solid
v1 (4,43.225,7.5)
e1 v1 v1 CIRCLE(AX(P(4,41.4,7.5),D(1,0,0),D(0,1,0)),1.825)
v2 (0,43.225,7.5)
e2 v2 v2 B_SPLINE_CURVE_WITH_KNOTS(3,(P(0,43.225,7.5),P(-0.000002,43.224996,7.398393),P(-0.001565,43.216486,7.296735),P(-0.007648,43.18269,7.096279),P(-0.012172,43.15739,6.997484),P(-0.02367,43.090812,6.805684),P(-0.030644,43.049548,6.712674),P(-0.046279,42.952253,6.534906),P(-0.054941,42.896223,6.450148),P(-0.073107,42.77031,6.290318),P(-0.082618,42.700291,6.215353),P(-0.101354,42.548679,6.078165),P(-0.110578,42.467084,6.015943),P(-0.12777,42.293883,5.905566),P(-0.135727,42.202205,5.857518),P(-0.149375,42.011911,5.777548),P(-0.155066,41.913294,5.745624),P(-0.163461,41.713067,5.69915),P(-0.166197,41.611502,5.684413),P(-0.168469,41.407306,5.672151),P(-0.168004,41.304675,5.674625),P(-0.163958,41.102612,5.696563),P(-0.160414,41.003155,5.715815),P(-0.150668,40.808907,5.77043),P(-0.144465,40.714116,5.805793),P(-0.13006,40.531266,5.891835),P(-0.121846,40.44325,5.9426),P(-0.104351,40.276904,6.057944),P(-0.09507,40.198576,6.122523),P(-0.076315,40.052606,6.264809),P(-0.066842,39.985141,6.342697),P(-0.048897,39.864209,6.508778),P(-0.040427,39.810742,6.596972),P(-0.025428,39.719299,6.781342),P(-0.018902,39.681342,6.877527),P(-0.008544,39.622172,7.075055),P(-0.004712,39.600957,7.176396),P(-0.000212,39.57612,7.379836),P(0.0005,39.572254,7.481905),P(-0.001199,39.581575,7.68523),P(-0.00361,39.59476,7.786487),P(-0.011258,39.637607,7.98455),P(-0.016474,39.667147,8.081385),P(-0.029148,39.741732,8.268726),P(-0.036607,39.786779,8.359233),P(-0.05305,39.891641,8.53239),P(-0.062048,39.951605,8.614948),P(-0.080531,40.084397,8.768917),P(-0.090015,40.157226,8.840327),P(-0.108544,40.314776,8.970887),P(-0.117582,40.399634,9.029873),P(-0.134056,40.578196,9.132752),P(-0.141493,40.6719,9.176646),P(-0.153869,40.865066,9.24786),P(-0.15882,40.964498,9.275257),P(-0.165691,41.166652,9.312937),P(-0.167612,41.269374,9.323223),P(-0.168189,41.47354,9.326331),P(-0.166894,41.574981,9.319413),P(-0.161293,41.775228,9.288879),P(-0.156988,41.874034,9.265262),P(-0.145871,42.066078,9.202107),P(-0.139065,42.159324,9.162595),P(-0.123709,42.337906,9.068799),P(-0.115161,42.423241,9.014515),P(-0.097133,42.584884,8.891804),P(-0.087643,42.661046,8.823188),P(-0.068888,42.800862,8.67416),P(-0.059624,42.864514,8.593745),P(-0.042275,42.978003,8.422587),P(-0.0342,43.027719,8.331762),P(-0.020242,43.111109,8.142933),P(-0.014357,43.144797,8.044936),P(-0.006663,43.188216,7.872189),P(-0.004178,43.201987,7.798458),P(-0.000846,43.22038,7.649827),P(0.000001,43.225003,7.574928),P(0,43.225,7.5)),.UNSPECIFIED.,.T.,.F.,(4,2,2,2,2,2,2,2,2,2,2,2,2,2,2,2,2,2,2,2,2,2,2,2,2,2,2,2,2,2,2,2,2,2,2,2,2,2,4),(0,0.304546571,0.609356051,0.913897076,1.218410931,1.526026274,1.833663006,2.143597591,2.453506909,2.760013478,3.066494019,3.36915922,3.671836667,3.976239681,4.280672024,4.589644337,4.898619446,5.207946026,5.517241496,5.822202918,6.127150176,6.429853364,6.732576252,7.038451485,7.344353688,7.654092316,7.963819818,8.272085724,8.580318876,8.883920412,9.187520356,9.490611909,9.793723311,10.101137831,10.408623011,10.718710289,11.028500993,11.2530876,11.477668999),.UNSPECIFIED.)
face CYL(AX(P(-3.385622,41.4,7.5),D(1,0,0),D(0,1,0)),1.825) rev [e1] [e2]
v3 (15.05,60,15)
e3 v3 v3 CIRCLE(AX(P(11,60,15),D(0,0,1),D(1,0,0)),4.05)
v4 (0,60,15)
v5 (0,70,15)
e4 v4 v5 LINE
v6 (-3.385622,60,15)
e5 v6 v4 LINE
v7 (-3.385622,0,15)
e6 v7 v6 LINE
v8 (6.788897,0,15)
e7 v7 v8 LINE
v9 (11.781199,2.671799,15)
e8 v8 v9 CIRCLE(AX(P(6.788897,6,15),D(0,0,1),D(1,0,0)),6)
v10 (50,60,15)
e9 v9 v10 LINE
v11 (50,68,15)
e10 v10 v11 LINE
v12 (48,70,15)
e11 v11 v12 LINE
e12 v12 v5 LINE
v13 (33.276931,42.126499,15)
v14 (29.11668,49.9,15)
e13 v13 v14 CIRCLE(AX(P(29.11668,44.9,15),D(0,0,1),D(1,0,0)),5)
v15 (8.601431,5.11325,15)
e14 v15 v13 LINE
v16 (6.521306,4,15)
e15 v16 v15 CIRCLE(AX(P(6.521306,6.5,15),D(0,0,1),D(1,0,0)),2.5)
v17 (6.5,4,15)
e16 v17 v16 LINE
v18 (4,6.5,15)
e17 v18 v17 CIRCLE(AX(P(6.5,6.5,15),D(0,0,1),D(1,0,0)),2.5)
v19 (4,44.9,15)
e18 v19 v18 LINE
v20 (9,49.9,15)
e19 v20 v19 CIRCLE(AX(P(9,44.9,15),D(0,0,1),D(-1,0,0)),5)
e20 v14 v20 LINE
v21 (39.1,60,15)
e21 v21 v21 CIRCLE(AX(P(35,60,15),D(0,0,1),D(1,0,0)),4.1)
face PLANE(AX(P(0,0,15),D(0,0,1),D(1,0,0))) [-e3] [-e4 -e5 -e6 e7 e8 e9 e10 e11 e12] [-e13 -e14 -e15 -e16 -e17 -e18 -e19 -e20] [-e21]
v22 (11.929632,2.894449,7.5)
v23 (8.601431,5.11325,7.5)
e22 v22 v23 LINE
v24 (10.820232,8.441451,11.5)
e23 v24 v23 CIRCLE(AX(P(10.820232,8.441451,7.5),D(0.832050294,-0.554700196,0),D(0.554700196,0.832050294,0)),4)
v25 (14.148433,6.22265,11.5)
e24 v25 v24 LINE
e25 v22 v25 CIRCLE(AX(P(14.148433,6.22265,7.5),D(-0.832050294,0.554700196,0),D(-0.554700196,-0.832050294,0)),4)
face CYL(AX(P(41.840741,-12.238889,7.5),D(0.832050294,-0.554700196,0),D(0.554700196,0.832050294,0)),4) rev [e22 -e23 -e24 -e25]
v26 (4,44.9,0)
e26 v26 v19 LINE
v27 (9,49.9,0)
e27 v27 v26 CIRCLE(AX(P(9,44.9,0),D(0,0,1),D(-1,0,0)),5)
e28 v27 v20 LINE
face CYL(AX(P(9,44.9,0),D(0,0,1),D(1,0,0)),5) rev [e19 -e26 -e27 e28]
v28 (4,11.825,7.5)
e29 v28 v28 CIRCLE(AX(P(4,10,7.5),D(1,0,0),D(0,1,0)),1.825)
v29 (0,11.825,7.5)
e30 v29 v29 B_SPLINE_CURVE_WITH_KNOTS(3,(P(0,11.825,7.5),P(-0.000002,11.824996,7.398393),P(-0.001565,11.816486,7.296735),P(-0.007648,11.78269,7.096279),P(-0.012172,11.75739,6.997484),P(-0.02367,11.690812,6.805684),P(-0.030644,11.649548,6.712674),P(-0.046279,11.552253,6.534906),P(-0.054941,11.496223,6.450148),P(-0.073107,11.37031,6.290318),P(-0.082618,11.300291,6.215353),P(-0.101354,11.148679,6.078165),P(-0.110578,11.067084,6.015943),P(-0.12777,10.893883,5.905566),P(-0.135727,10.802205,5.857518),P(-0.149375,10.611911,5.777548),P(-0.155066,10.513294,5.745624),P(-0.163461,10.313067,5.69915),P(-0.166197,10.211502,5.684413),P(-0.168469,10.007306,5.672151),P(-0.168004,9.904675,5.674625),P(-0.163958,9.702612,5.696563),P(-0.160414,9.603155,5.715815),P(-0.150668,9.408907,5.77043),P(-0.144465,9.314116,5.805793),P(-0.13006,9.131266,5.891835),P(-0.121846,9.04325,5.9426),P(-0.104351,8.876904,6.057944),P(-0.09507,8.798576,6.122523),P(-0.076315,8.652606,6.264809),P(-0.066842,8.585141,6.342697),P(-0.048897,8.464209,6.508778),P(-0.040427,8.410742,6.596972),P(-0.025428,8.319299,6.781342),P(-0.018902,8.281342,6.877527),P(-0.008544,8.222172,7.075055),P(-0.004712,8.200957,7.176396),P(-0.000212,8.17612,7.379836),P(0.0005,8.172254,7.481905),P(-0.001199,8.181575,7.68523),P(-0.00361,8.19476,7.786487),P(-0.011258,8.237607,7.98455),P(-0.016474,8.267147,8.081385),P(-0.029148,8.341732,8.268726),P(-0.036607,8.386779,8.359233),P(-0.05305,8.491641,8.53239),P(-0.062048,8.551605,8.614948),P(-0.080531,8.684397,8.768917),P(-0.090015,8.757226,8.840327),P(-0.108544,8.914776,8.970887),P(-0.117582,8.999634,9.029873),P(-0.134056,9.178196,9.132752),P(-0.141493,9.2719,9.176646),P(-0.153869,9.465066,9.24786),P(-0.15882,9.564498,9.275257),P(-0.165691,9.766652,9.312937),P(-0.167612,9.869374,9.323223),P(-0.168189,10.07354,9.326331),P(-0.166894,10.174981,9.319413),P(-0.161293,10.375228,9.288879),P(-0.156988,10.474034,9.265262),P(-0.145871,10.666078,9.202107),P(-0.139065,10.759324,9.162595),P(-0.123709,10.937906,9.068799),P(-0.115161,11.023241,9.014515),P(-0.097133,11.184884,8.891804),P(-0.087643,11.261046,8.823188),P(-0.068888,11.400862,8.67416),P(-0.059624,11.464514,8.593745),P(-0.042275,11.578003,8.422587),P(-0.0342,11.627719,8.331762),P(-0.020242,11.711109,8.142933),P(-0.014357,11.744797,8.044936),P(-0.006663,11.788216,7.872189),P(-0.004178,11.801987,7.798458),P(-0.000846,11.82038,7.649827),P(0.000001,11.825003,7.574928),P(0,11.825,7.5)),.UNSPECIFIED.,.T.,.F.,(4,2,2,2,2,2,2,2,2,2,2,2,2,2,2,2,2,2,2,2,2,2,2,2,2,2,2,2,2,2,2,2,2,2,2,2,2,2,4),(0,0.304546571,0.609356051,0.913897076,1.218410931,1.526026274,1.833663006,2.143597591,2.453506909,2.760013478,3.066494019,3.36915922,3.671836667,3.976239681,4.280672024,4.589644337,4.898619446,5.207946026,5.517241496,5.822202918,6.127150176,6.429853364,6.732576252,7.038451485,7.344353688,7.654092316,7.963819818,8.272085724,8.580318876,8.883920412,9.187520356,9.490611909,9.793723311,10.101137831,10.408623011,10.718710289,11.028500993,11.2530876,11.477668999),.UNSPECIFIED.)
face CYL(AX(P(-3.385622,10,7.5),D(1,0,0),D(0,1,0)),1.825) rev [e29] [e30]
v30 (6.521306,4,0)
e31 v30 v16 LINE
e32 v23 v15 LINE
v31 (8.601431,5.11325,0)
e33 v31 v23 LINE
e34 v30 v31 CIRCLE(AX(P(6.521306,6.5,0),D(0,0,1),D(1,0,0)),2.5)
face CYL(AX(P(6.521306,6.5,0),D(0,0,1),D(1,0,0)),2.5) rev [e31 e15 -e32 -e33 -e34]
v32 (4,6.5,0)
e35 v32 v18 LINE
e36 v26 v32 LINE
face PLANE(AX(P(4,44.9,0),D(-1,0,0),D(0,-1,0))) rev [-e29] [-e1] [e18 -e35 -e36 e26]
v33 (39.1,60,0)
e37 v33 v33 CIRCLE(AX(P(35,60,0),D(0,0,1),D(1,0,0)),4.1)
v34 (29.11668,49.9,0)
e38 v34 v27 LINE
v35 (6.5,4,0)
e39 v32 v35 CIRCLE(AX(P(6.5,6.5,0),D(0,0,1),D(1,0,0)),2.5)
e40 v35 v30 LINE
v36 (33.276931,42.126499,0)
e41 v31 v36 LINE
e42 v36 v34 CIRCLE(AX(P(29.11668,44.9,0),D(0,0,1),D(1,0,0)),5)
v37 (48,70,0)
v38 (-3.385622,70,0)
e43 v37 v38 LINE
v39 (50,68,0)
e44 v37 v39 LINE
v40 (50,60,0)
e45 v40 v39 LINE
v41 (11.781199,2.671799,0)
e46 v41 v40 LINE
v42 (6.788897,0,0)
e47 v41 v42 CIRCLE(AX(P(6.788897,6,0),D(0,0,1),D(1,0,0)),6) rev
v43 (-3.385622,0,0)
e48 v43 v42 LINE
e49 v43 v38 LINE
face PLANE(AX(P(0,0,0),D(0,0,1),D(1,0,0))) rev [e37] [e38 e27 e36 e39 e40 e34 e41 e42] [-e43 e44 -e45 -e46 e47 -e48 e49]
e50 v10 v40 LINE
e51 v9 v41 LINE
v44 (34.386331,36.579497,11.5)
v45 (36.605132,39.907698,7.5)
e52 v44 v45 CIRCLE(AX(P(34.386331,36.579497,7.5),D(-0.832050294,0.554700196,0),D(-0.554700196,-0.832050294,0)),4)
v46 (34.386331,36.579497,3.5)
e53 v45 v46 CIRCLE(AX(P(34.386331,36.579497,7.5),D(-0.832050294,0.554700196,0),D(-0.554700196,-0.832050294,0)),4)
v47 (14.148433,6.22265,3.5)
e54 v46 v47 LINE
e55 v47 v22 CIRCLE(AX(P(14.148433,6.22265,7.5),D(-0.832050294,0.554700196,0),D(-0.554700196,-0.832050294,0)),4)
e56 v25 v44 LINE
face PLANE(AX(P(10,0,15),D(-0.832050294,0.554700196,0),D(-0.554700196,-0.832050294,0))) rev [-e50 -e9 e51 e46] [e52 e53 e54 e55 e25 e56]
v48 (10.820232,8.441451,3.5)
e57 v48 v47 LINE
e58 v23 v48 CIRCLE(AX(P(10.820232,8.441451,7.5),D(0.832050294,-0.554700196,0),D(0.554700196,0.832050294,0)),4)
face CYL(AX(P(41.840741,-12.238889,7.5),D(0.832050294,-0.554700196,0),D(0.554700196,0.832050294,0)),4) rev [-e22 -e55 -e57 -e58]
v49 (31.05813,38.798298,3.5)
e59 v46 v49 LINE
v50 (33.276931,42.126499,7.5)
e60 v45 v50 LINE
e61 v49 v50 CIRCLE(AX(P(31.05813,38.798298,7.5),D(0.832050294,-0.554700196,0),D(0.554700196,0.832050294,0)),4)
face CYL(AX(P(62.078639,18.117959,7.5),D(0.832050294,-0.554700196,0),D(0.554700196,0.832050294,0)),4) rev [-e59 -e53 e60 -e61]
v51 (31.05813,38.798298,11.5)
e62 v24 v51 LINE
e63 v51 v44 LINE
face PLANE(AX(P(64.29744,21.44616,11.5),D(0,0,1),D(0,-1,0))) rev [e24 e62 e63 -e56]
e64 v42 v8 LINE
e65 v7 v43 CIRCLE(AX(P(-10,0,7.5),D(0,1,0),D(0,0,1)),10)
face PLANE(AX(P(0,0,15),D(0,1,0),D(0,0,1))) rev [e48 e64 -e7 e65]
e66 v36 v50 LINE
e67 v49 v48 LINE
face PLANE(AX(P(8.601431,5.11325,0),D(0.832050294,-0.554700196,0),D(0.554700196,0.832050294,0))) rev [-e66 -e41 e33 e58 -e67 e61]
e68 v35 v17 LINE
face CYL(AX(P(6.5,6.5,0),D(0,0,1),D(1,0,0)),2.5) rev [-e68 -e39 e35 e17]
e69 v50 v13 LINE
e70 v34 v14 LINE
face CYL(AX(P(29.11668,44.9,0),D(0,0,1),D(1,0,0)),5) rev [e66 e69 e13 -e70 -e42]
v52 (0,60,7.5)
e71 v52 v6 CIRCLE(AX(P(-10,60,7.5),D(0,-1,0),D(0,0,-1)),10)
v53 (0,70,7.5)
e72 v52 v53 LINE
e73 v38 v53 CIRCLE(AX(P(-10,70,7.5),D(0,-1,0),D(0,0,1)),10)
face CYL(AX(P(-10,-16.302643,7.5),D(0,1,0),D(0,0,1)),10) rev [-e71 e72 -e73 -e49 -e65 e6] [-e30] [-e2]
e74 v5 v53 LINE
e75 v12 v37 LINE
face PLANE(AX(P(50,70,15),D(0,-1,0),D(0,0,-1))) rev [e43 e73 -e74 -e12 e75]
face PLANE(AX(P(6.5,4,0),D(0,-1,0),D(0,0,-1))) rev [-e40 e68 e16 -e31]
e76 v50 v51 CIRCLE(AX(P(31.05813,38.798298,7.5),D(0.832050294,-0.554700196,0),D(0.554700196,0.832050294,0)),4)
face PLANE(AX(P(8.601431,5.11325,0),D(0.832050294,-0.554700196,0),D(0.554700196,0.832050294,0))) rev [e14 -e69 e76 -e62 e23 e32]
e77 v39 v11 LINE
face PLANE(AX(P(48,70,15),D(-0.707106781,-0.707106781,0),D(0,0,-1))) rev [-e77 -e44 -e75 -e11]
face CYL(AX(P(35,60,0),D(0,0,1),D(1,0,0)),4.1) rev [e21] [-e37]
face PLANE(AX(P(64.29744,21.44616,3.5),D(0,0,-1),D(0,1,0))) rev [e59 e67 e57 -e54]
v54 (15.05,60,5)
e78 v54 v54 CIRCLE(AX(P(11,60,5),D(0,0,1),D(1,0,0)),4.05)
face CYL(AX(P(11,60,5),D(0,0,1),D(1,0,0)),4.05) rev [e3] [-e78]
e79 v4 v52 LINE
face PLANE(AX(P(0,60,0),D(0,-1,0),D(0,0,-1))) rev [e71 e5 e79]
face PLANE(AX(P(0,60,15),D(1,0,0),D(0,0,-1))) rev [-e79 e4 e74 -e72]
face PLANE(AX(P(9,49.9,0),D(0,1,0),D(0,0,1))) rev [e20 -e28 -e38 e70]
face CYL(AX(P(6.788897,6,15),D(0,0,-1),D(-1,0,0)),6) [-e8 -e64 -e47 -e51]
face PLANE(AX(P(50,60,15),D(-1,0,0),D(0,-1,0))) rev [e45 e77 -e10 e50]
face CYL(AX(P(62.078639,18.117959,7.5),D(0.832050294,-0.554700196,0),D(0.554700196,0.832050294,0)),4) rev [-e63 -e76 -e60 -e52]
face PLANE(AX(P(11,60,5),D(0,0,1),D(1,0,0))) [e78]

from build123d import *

# Parameters (mm, degrees)
P_IDAT_VYSUNUT_M1_DEPTH  = 15
SKICA2_R                 = 4.1
ODEBRAT_VYSUNUT_M1_DEPTH = 88.321245983
SKICA3_R                 = 4.05
ODEBRAT_VYSUNUT_M2_DEPTH = 10
ODEBRAT_VYSUNUT_M3_DEPTH = 88.321245983
P_IDAT_VYSUNUT_M2_DEPTH  = 70
SKICA6_W                 = 3.385621722
SKICA6_H                 = 7.5
ODEBRAT_VYSUNUT_M4_DEPTH = 10
SKICA8_W                 = 8
SKICA8_H                 = 44.48438966
ODEBRAT_VYSUNUT_M5_DEPTH = 88.290898193
ZAOBLIT1_R               = 4
SKICA9_R                 = 1.825
ODEBRAT_VYSUNUT_M6_DEPTH = 86.094065598
ZAOBLIT3_R               = 6
ZKOSEN_1_SIZE            = 2


with BuildPart() as part:
    # Skica1 → Přidat vysunutím1 (new body)
    with BuildSketch(Plane.XY):
        Polygon((0, 0), (10, 0), (50, 60), (50, 70), (0, 70), align=None)
    extrude(amount=P_IDAT_VYSUNUT_M1_DEPTH)

    # Skica2 → Odebrat vysunutím1 (cut, through all)
    with BuildSketch(Plane.XY.offset(15)):
        with Locations((35, 60)):
            Circle(SKICA2_R)
    extrude(amount=-ODEBRAT_VYSUNUT_M1_DEPTH, mode=Mode.SUBTRACT)

    # Skica3 → Odebrat vysunutím2 (cut)
    with BuildSketch(Plane.XY.offset(15)):
        with Locations((11, 60)):
            Circle(SKICA3_R)
    extrude(amount=-ODEBRAT_VYSUNUT_M2_DEPTH, mode=Mode.SUBTRACT)

    # Skica4 → Odebrat vysunutím3 (cut, through all)
    with BuildSketch(Plane.XY.offset(15)):
        with BuildLine():
            Line((9, 49.9), (29.116679507, 49.9))
            ThreePointArc((29.116679507, 49.9), (33.525052501, 47.259289628), (33.276930979, 42.126499019))
            Line((33.276930979, 42.126499019), (8.601431306, 5.113249509))
            ThreePointArc((8.601431306, 5.113249509), (7.700950384, 4.295813503), (6.52130557, 4))
            Line((6.52130557, 4), (6.5, 4))
            ThreePointArc((6.5, 4), (4.732233047, 4.732233047), (4, 6.5))
            Line((4, 6.5), (4, 44.9))
            ThreePointArc((4, 44.9), (5.464466094, 48.435533906), (9, 49.9))
        make_face()
    extrude(amount=-ODEBRAT_VYSUNUT_M3_DEPTH, mode=Mode.SUBTRACT)

    # Skica5 → Přidat vysunutím2 (add)
    with BuildSketch(Plane(origin=(0, 70, 0), x_dir=(1, 0, 0), z_dir=(0, 1, 0))):
        with BuildLine():
            Line((-3.385621722, 0), (3, 0))
            Line((3, 0), (3, -15))
            Line((3, -15), (-3.385621722, -15))
            ThreePointArc((-3.385621722, -15), (0, -7.5), (-3.385621722, 0))
        make_face()
    extrude(amount=-P_IDAT_VYSUNUT_M2_DEPTH)

    # Skica6 → Odebrat vysunutím4 (cut)
    with BuildSketch(Plane(origin=(0, 70, 0), x_dir=(1, 0, 0), z_dir=(0, 1, 0))):
        with Locations((-1.692810861, -11.25)):
            Rectangle(SKICA6_W, SKICA6_H)
    extrude(amount=-ODEBRAT_VYSUNUT_M4_DEPTH, mode=Mode.SUBTRACT)

    # Skica8 → Odebrat vysunutím5 (cut, through all)
    with BuildSketch(Plane(origin=(3.594875746, -2.39658383, 0), x_dir=(0, 0, 1), z_dir=(-0.8320502943378438, 0.5547001962252291, 0))):
        with Locations((7.5, 31.267891222)):
            Rectangle(SKICA8_W, SKICA8_H)
    extrude(amount=-ODEBRAT_VYSUNUT_M5_DEPTH, mode=Mode.SUBTRACT)

    # Zaoblit1
    zaoblit1_edges = [part.edges().sort_by_distance(p)[0] for p in [
        (34.941031567, 41.017098626, 3.5),
        (34.941031567, 41.017098626, 11.5),
        (10.265531894, 4.003849117, 11.5),
        (10.265531894, 4.003849117, 3.5),
    ]]
    fillet(zaoblit1_edges, radius=ZAOBLIT1_R - 0.0001)  # a hair under: the kernel refuses the full size

    # Skica9 → Odebrat vysunutím6 (cut, through all)
    with BuildSketch(Plane(origin=(4, 0, 0), x_dir=(0, 0, -1), z_dir=(1, 0, 0))):
        with Locations(Location((-7.5, 10, 0), (0, 0, 90))):
            Circle(SKICA9_R)
        with Locations(Location((-7.5, 41.4, 0), (0, 0, 90))):
            Circle(SKICA9_R)
    extrude(amount=-ODEBRAT_VYSUNUT_M6_DEPTH, mode=Mode.SUBTRACT)

    # Zaoblit3
    zaoblit3_edges = [part.edges().sort_by_distance(p)[0] for p in [
        (10, 0, 7.5),
    ]]
    fillet(zaoblit3_edges, radius=ZAOBLIT3_R)

    # Zkosení1
    zkosen_1_edges = [part.edges().sort_by_distance(p)[0] for p in [
        (50, 70, 7.5),
    ]]
    chamfer(zkosen_1_edges, length=ZKOSEN_1_SIZE)


solid = part.part
